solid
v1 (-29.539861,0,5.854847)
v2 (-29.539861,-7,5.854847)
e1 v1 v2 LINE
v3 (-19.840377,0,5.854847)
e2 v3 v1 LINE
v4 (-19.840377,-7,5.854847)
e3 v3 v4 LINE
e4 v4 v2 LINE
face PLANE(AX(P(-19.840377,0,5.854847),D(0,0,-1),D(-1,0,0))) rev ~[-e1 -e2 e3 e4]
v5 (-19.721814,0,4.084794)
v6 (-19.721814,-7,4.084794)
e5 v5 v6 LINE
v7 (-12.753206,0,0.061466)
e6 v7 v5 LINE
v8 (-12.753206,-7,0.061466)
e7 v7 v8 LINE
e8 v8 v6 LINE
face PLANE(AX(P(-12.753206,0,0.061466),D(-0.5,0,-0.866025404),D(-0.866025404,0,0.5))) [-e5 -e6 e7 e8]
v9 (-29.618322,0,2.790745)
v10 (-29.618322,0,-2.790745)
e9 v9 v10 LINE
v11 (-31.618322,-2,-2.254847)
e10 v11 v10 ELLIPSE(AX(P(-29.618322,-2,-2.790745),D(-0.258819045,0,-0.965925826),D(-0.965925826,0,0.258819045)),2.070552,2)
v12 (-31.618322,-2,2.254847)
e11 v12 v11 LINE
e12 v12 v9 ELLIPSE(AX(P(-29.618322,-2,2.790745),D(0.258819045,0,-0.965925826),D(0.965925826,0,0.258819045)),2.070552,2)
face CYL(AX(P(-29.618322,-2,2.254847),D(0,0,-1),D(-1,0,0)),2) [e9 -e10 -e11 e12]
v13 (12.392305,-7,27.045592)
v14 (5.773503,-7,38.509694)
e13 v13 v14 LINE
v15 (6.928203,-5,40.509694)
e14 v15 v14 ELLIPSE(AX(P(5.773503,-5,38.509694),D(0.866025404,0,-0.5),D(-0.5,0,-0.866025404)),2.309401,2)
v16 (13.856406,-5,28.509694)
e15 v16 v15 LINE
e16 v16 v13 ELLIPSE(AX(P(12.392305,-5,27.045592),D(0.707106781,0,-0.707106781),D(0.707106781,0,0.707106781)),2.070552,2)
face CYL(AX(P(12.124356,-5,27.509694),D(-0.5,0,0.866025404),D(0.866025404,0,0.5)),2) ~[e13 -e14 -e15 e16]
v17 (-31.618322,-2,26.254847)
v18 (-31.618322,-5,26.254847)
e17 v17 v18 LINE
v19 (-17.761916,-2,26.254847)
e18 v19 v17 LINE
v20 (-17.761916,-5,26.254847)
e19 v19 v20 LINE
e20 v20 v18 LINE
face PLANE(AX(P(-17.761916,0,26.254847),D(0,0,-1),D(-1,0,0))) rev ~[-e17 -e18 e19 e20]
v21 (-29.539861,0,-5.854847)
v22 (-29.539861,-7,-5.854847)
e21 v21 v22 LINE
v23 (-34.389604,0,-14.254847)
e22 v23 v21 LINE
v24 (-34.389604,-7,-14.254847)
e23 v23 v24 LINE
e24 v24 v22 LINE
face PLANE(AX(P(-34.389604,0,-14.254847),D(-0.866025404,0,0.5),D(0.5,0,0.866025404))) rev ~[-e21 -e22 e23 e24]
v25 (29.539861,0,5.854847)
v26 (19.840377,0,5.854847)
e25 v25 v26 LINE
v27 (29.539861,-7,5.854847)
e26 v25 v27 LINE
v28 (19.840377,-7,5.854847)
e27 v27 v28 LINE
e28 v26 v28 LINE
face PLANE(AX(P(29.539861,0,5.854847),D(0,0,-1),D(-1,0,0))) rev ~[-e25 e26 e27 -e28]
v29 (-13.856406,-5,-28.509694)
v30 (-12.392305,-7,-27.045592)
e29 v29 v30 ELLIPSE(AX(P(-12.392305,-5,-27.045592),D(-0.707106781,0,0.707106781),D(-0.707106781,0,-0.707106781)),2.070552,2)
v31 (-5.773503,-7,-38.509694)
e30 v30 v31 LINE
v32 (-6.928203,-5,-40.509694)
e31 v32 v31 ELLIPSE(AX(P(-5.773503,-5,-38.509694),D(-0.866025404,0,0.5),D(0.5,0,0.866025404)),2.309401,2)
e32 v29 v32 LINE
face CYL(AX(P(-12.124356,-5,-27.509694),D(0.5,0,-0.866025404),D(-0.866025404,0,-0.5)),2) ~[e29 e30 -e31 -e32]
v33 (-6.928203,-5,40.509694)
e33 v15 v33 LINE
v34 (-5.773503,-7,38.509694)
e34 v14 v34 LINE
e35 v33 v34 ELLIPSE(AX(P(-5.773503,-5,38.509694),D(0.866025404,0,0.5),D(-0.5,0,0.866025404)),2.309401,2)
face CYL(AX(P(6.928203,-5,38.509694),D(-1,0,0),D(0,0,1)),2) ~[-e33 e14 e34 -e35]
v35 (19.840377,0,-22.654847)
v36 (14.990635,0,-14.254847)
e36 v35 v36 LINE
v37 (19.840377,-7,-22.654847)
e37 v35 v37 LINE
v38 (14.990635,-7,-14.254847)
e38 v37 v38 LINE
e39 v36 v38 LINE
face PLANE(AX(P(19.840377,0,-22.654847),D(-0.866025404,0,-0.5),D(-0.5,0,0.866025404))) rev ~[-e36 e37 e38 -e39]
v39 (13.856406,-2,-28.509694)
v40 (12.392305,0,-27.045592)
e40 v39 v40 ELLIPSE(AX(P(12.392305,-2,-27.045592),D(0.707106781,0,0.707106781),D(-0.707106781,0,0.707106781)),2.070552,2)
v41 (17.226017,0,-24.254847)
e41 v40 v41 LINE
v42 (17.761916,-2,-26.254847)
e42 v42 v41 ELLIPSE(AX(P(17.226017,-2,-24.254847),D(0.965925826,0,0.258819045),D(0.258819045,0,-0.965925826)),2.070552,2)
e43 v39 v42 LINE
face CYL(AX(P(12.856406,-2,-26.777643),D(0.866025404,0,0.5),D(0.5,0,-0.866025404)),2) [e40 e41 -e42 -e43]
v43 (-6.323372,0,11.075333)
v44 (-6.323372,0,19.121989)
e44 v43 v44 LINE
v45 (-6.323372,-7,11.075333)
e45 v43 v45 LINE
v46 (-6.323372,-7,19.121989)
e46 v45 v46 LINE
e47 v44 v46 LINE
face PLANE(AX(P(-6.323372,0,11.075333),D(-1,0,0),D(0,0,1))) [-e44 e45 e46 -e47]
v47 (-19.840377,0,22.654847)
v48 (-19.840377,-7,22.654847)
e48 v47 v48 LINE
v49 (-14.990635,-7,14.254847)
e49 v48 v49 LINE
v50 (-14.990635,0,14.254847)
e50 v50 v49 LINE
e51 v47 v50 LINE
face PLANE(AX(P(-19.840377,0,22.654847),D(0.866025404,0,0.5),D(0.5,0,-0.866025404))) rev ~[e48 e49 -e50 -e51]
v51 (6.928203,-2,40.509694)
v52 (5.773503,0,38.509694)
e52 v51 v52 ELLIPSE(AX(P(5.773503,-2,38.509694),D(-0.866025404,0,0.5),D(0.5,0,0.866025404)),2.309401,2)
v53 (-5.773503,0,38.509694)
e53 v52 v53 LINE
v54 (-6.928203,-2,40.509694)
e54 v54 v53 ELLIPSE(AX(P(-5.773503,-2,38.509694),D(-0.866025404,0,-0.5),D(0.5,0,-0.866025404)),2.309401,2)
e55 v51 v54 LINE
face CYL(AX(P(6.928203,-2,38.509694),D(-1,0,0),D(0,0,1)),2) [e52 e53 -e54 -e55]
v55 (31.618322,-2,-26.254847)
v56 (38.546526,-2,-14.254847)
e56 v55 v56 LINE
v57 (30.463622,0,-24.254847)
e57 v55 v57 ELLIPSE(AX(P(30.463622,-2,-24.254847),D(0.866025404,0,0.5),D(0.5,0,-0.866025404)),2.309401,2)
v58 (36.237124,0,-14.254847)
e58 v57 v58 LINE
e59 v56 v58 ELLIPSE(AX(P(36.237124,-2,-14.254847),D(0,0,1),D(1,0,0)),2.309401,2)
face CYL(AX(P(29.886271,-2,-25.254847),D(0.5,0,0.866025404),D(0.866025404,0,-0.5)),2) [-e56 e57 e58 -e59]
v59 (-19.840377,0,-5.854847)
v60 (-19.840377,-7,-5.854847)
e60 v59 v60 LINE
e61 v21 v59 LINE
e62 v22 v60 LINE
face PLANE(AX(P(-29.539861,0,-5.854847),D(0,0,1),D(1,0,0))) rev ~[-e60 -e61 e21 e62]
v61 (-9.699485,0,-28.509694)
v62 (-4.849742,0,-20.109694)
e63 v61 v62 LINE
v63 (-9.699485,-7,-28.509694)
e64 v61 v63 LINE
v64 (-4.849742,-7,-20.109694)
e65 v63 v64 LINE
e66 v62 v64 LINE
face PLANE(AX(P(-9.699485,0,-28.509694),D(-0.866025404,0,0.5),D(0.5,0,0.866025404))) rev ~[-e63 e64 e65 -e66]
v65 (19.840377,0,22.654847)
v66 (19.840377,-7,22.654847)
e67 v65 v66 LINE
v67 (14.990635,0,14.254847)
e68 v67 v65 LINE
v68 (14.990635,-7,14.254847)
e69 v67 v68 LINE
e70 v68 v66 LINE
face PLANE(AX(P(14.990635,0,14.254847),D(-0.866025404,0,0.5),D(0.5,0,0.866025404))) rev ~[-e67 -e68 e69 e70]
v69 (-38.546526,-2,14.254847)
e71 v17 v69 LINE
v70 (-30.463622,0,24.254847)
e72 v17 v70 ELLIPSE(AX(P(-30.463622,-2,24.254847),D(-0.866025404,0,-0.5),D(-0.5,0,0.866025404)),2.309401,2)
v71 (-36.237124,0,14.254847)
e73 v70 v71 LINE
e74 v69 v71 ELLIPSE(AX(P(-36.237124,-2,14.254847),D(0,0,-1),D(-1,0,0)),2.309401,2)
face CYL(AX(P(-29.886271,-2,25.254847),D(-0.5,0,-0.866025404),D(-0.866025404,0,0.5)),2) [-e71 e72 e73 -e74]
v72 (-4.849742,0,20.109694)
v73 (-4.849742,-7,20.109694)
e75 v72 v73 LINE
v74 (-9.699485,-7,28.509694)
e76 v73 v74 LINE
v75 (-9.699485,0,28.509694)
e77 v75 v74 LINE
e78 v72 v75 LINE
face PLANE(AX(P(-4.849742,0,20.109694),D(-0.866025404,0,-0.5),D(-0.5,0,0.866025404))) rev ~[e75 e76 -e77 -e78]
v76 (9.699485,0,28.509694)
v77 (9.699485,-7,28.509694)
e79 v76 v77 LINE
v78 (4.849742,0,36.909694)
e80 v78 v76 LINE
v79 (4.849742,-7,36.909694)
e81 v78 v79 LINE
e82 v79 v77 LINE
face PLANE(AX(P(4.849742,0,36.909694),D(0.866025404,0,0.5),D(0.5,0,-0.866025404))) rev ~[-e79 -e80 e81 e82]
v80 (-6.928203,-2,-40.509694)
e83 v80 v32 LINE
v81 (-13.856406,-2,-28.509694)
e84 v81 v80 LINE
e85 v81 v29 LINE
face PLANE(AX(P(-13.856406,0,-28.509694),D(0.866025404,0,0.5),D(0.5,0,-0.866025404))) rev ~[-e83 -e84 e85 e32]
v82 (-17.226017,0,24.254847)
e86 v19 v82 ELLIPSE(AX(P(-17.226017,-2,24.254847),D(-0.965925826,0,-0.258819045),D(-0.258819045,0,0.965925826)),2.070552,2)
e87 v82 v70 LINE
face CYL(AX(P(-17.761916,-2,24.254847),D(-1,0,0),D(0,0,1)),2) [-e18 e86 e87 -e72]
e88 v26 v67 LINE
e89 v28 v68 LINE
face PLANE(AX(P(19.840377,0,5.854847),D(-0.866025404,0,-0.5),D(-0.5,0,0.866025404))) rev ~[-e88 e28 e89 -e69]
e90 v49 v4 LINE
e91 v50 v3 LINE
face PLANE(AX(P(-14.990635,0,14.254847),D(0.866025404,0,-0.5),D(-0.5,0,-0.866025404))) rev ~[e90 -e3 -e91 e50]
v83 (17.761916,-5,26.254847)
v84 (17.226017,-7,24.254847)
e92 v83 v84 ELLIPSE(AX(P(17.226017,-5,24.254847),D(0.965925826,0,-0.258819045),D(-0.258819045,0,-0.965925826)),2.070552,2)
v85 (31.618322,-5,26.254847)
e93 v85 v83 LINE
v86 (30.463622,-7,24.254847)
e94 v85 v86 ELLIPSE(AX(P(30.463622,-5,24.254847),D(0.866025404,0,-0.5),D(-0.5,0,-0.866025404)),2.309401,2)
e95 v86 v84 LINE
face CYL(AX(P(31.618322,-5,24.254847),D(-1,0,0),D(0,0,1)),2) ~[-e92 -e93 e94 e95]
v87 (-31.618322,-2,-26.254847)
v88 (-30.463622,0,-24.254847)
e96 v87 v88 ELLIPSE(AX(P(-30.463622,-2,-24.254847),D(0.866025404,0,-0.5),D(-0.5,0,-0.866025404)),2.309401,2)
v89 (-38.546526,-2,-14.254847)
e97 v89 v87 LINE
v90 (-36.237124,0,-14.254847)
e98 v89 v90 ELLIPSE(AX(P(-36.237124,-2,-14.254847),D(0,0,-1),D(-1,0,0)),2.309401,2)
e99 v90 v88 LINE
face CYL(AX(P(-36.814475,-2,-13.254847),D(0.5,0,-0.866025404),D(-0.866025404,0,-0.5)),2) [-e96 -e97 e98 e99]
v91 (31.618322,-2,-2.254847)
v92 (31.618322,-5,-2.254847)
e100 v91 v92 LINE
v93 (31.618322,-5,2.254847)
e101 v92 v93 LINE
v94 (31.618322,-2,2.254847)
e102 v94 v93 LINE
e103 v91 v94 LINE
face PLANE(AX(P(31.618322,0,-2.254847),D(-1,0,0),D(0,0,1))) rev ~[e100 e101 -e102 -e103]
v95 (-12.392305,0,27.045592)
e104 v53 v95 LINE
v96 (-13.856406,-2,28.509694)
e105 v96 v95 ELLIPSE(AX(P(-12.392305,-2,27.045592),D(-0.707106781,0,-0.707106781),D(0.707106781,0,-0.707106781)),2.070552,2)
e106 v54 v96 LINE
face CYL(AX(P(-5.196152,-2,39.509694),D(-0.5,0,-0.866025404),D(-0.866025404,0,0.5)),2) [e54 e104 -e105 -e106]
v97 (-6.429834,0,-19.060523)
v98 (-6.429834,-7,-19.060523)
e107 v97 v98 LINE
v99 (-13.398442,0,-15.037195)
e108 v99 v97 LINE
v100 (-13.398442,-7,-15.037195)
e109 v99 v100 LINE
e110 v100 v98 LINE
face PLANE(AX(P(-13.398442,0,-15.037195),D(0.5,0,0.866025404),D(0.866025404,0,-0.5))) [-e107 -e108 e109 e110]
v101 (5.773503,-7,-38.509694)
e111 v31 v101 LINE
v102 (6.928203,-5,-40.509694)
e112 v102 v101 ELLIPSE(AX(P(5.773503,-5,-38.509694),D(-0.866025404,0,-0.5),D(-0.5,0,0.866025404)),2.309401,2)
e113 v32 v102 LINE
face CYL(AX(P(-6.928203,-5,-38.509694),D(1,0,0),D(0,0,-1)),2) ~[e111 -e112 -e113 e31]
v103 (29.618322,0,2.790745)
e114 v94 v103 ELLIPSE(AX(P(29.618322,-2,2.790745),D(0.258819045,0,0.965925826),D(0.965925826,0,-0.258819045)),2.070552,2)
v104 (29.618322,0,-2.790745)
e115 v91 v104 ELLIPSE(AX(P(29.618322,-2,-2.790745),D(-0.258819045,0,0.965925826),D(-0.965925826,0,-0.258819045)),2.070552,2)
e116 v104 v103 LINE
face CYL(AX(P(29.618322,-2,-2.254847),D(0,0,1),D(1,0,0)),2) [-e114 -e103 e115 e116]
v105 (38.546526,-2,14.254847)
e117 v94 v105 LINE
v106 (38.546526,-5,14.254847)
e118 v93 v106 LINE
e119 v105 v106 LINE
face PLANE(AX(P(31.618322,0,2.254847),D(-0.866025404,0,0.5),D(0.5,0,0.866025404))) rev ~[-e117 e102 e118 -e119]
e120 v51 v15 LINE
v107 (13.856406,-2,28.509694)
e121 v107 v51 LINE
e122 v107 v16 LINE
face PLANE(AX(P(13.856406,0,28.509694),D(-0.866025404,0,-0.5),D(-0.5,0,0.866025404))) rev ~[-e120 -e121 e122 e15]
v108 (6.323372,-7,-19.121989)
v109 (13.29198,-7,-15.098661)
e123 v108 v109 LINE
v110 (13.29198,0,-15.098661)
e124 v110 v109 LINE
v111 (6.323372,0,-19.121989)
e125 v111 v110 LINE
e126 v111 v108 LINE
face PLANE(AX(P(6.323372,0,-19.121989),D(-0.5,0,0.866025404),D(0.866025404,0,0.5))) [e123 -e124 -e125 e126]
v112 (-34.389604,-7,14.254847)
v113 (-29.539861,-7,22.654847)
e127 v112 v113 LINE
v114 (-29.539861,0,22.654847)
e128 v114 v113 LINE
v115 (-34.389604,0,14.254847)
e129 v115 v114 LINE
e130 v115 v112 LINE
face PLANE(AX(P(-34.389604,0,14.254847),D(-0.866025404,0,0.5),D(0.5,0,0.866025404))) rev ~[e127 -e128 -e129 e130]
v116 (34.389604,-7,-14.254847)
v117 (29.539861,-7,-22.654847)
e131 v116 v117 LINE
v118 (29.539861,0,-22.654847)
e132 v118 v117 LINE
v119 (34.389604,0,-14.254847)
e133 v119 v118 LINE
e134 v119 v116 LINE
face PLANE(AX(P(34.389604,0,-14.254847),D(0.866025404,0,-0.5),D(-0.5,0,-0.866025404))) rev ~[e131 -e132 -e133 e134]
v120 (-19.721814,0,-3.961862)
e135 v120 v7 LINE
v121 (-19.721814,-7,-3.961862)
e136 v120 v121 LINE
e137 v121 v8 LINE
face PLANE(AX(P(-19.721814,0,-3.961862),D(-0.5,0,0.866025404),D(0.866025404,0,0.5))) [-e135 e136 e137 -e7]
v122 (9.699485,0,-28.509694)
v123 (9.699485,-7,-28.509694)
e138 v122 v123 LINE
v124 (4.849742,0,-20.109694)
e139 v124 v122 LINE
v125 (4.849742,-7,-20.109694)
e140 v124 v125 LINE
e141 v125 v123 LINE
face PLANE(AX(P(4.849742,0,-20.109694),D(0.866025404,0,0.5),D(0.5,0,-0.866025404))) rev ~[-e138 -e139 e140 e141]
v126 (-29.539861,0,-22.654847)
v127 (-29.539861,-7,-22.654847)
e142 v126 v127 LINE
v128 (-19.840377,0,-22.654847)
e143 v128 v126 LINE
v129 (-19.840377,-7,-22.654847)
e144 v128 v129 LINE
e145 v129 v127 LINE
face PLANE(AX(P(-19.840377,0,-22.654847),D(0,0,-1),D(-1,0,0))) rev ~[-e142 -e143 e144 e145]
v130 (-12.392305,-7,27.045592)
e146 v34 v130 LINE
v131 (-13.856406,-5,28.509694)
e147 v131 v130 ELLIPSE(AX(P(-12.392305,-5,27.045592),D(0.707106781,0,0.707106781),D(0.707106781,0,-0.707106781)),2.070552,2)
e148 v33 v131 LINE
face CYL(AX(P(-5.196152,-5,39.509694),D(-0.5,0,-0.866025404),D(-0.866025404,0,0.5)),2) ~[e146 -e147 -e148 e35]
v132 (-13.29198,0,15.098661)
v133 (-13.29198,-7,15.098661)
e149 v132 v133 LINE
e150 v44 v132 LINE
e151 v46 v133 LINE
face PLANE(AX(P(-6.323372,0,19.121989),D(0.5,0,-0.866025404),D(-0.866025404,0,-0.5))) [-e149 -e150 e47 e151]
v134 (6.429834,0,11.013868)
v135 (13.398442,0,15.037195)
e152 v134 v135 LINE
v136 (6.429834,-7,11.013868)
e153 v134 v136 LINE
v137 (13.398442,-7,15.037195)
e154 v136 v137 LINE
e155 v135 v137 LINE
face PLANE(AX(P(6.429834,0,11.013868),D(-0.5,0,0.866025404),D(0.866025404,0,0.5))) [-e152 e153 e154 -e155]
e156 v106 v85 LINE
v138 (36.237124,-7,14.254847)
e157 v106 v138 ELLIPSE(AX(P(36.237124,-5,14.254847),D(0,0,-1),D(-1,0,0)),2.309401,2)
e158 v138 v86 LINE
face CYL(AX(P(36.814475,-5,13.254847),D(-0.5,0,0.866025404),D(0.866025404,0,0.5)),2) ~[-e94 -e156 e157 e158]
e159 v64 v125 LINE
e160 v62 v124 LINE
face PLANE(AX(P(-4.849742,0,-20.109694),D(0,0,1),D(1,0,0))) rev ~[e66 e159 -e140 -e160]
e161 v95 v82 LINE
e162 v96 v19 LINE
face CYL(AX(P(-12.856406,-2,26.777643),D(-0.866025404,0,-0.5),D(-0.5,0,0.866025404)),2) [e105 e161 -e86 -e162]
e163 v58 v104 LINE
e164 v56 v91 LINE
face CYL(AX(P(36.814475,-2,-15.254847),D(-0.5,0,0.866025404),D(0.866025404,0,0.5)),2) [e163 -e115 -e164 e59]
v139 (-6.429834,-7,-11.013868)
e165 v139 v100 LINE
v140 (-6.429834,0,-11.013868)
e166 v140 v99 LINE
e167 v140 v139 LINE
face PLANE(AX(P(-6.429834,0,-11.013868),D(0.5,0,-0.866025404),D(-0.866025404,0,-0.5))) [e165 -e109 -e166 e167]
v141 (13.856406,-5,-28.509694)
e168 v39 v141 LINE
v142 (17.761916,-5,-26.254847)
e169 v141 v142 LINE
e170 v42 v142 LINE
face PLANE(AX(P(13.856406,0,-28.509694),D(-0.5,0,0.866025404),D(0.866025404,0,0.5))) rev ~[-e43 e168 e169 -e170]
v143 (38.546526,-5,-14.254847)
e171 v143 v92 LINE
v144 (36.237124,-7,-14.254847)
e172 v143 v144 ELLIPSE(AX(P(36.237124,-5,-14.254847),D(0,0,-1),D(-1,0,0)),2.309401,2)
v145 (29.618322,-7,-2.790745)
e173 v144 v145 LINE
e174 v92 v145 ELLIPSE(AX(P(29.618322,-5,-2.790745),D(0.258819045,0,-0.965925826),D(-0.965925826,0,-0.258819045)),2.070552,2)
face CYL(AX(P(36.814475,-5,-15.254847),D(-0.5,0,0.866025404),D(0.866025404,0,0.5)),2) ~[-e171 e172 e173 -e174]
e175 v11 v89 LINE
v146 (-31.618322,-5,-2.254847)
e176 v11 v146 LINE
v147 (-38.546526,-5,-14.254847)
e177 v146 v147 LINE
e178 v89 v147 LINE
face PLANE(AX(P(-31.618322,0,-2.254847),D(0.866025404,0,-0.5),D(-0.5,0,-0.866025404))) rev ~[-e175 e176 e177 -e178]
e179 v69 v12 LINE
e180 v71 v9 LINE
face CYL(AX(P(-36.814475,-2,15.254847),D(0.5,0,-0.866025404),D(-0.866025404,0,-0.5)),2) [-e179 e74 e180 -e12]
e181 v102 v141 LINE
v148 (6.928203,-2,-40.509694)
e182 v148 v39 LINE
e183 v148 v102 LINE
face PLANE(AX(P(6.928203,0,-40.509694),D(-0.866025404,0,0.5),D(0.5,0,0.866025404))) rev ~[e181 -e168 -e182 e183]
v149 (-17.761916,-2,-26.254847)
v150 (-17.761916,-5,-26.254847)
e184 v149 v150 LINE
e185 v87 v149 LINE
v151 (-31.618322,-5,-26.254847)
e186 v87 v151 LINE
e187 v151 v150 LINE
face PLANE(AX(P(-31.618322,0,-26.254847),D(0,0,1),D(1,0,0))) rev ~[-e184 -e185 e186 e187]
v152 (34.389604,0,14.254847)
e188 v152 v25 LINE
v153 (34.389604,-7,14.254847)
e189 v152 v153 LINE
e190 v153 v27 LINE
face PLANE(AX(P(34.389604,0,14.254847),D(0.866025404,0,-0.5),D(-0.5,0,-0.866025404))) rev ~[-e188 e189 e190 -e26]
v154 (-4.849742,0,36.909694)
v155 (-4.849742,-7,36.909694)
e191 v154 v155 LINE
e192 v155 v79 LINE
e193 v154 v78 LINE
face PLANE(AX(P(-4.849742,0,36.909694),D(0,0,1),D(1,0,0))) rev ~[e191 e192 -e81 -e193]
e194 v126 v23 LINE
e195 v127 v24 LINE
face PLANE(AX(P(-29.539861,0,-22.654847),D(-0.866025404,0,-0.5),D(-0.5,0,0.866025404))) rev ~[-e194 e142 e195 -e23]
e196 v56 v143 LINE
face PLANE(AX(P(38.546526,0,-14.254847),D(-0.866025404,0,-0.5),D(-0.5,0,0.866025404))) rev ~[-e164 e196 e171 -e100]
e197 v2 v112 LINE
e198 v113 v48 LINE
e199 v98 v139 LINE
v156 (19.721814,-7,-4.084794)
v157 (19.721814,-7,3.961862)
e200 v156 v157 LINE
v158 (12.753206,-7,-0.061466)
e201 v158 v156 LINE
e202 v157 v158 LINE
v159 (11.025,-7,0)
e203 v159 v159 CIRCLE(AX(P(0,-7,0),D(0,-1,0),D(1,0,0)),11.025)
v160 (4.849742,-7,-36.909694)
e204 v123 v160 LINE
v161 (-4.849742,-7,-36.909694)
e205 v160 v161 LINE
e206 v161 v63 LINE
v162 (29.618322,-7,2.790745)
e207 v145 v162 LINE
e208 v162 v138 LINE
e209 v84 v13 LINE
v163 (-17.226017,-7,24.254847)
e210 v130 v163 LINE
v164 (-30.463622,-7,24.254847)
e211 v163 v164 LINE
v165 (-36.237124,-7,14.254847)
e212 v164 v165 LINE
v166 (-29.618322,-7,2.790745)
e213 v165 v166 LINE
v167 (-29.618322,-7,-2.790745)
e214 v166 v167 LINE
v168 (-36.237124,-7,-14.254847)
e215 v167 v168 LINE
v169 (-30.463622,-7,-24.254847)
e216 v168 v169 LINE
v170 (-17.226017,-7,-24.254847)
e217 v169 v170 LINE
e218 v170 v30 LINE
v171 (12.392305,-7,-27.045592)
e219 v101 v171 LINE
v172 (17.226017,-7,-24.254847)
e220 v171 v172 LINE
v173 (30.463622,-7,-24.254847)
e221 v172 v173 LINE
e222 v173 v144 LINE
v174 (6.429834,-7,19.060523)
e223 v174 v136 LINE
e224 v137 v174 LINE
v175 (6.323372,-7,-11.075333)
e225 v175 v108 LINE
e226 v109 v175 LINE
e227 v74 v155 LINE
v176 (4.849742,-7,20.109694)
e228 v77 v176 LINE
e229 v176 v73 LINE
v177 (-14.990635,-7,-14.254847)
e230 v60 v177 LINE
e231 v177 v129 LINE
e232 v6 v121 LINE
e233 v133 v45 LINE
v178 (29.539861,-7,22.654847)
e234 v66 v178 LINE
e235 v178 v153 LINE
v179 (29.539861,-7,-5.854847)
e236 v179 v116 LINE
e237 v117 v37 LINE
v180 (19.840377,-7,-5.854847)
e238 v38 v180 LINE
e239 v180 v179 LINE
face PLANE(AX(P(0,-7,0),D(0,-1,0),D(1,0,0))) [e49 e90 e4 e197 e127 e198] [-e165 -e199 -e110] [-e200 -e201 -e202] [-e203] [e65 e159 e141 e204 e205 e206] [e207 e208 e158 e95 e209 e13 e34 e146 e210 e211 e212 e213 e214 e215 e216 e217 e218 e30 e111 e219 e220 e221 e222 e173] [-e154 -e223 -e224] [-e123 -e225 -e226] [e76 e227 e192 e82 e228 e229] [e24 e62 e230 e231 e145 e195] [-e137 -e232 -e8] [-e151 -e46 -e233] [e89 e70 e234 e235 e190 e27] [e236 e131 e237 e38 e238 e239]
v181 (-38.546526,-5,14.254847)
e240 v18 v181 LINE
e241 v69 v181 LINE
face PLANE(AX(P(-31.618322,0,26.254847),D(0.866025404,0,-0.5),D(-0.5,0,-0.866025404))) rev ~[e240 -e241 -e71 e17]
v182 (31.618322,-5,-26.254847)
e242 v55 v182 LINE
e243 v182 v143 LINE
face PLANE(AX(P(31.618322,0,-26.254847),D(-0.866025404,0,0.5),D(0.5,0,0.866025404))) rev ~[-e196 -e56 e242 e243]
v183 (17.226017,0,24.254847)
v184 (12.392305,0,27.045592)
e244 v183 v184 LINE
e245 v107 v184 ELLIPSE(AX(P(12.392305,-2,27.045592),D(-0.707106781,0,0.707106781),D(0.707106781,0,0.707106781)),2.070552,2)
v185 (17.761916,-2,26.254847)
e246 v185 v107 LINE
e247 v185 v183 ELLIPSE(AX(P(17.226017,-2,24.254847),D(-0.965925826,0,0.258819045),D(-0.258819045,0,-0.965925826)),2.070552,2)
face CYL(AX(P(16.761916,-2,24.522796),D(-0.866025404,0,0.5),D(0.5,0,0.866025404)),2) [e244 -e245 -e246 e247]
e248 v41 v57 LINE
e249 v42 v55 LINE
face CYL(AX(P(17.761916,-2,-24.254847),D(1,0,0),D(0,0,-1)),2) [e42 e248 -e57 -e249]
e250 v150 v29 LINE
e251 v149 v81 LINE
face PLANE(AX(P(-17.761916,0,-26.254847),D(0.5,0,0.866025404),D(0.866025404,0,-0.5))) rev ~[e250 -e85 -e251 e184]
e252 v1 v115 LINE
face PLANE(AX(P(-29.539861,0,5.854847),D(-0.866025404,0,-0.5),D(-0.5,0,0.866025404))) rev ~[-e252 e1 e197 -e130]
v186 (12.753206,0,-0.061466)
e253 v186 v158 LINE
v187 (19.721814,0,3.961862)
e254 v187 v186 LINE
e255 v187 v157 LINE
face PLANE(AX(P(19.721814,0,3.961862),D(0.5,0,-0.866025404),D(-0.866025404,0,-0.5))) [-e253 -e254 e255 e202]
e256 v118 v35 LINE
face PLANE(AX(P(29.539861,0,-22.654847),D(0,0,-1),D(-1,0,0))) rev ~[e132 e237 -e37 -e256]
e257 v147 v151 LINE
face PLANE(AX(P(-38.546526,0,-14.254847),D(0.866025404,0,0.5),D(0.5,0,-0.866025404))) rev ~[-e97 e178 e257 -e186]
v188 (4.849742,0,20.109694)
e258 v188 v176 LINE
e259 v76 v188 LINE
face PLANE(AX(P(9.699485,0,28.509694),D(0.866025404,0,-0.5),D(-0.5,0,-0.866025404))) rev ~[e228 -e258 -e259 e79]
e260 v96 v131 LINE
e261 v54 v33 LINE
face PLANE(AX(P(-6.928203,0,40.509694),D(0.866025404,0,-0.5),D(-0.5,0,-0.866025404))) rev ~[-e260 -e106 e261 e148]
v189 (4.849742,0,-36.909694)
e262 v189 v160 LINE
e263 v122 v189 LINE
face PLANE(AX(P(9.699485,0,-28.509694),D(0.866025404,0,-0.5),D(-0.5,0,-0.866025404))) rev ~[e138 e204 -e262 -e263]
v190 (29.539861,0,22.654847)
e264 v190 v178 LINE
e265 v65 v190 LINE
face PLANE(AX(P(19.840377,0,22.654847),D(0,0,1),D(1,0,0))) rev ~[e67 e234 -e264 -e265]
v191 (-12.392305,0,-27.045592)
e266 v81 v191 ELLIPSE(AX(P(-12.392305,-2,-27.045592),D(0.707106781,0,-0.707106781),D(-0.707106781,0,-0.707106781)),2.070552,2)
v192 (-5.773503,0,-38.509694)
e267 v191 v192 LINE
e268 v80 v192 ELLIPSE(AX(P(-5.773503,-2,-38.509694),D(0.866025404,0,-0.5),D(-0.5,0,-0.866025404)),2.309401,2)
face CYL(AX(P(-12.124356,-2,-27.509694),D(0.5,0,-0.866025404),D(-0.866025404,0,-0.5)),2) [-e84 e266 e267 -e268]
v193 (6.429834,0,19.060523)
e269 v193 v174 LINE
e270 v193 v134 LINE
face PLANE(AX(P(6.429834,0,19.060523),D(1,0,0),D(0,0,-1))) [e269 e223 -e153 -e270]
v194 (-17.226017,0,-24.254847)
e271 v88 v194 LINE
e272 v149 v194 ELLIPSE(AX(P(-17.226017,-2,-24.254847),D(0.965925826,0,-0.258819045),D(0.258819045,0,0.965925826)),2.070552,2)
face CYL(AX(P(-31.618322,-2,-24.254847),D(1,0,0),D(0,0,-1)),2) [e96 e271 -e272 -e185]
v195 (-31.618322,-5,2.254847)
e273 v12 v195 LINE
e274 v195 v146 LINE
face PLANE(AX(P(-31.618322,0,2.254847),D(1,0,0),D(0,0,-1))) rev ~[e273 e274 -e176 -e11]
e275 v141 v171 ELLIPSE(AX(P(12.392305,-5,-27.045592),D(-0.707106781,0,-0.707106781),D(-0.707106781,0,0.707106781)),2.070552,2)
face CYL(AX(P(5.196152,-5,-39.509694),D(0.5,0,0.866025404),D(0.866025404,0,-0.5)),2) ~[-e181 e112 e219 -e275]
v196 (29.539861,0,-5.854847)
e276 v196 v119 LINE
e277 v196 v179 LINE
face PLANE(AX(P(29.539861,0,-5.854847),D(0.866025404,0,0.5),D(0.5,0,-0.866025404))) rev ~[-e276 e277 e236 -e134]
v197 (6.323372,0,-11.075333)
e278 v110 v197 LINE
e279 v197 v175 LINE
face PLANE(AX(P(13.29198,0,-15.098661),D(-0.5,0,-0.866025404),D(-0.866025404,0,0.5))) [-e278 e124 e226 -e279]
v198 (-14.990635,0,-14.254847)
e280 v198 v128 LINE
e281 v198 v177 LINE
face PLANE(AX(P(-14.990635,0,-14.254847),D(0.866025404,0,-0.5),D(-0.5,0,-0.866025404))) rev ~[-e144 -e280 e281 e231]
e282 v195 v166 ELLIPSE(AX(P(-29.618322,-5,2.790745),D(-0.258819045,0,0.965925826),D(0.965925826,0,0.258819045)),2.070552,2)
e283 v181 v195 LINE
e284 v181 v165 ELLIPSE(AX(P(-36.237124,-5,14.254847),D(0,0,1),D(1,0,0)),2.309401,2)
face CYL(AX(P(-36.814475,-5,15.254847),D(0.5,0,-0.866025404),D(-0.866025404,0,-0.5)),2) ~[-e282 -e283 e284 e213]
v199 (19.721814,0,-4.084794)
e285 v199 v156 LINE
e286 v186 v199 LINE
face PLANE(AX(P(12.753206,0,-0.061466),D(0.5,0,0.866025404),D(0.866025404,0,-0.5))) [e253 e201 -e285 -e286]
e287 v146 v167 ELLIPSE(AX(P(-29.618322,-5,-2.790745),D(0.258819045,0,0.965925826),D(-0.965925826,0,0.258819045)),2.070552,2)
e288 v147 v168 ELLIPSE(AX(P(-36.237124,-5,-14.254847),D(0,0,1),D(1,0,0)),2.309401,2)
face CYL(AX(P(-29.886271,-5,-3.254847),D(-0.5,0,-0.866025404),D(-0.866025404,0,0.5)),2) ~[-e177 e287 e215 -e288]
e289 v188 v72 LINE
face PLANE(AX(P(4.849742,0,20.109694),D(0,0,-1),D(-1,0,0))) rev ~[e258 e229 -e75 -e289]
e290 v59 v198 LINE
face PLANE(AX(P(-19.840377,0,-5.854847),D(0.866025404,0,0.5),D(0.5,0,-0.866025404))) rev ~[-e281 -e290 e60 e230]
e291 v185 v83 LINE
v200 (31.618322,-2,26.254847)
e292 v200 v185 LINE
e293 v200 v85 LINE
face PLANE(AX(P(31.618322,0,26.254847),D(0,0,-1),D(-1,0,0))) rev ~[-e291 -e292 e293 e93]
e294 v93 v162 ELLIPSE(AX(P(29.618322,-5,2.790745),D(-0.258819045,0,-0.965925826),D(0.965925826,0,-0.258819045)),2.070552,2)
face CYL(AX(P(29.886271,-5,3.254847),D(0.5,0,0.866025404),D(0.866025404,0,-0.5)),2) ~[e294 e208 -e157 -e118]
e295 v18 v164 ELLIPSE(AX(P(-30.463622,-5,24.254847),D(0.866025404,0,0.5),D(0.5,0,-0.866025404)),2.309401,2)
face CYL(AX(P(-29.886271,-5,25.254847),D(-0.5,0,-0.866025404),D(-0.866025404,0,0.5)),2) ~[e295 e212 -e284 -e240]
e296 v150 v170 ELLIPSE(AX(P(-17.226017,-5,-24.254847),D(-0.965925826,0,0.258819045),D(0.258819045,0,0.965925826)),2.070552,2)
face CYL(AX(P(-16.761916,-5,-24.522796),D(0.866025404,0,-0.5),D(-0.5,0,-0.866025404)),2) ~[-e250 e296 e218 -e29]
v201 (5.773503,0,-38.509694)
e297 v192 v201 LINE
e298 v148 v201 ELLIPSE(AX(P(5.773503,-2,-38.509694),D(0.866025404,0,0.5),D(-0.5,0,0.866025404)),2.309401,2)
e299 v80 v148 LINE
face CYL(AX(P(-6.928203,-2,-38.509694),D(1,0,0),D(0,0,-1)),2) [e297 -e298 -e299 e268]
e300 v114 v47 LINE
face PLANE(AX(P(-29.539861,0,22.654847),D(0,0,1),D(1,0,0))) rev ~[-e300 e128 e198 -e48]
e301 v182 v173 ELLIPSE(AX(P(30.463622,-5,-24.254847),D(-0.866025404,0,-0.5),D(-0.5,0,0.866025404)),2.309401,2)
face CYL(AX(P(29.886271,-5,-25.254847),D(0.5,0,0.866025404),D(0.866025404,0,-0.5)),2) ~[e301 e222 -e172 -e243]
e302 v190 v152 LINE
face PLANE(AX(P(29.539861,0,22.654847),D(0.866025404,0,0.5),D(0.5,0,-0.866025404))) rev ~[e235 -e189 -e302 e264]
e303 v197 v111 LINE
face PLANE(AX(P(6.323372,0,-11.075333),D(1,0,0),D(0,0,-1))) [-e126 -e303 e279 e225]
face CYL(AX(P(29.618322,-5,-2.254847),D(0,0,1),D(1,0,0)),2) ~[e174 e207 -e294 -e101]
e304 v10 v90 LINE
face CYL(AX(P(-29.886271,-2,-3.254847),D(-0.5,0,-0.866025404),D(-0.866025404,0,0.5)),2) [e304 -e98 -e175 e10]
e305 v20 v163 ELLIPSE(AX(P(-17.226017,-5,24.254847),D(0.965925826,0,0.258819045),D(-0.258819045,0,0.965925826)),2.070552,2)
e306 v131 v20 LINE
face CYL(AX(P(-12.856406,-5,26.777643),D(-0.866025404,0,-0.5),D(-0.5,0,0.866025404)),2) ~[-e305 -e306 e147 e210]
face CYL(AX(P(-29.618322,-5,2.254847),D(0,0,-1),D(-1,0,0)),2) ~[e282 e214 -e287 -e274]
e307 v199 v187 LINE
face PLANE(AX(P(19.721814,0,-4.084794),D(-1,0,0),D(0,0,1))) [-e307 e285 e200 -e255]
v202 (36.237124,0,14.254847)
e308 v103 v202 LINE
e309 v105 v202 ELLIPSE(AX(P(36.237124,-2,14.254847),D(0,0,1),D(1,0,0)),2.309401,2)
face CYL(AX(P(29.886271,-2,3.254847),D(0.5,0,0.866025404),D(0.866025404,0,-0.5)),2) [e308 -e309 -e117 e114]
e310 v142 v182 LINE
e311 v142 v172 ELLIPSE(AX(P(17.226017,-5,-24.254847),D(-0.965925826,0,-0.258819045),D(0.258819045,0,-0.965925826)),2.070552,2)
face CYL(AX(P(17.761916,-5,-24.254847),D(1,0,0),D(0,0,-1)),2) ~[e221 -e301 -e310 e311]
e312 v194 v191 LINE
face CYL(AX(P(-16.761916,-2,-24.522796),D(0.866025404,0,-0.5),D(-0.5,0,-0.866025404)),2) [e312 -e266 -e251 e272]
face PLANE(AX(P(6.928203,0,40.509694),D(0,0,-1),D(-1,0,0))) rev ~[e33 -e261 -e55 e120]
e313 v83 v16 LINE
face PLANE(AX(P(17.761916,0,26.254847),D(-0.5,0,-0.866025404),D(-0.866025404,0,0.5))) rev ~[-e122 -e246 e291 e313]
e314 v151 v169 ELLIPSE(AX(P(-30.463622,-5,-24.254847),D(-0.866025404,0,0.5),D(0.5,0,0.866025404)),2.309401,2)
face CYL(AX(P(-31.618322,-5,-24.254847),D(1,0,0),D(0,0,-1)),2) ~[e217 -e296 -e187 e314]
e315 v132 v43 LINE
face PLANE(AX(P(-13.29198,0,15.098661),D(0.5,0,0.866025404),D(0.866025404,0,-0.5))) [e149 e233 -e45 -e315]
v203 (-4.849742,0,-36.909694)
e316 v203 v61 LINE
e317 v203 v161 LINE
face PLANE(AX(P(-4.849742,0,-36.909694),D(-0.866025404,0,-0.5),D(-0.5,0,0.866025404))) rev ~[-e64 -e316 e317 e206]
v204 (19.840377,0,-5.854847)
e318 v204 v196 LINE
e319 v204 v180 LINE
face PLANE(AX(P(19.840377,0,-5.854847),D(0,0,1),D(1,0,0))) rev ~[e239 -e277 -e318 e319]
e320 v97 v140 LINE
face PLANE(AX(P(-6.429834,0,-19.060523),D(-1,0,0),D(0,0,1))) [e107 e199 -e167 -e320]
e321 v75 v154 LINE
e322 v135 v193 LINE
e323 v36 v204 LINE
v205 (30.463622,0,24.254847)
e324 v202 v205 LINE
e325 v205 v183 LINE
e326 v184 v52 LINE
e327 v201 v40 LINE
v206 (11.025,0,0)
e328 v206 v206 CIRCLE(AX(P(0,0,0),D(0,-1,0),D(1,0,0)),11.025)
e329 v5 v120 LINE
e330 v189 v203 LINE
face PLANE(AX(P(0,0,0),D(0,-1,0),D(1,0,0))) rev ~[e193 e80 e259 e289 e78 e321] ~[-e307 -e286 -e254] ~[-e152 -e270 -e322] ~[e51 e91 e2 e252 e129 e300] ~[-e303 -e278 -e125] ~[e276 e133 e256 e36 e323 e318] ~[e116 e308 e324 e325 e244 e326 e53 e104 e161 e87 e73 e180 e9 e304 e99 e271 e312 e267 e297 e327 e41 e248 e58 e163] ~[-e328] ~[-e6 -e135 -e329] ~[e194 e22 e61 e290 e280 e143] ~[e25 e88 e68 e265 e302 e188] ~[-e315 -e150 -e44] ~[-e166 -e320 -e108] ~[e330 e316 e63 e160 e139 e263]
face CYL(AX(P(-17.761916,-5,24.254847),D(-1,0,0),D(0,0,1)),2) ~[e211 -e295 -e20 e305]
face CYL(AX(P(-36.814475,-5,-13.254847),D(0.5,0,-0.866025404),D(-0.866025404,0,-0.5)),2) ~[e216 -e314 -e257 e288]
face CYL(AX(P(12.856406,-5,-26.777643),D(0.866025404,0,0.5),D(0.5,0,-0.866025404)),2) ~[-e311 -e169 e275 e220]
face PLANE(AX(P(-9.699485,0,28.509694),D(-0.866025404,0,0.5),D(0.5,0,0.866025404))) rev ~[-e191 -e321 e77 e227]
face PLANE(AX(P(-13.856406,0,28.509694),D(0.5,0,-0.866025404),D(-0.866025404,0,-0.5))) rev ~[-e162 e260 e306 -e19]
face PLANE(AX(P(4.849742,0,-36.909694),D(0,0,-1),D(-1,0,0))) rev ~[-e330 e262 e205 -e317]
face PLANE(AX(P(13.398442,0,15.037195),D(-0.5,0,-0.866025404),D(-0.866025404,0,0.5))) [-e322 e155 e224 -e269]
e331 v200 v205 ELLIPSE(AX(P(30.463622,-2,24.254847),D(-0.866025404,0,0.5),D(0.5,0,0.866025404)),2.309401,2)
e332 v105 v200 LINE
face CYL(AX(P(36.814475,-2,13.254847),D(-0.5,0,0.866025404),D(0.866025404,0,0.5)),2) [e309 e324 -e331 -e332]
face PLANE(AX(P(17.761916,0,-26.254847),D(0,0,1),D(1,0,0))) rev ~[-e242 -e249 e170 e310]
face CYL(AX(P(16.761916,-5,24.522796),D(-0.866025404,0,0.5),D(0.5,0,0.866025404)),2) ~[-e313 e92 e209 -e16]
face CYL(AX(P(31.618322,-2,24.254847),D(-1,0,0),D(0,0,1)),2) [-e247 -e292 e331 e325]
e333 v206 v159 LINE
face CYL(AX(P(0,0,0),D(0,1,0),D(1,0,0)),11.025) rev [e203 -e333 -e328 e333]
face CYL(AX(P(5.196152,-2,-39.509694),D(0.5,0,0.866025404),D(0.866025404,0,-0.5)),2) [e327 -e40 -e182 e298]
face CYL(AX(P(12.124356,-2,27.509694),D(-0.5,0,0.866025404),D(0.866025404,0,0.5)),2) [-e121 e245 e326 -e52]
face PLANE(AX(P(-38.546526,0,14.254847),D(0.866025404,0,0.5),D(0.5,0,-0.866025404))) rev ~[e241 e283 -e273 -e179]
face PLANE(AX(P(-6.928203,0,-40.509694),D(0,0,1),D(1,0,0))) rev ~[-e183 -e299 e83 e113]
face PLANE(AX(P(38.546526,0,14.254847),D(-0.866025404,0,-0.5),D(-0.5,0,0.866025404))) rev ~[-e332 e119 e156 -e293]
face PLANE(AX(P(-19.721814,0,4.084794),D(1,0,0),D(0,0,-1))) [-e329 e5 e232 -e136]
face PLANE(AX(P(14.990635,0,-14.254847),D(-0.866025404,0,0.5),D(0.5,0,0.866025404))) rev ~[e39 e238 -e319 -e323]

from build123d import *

# Parameters (mm, degrees)
F0_R     = 14.5
F0_R_2   = 11.025
F1_DEPTH = 7
F2_R     = 2
F4_DEPTH = 7


# Not quite as in the source:
# - a feature names something its author has since deleted; it is built from what else it names


with BuildPart() as f1:
    # F0 (on Front) → F1 (new body)
    with BuildSketch(Plane.XZ):
        Polygon((13.8564064606, 28.5096937621), (6.9282032303, 16.5096937621), (-6.9282032303, 16.5096937621), (-13.8564064606, 28.5096937621), (-17.7619158218, 26.254846881), (-10.8337125915, 14.254846881), (-17.7619158218, 2.254846881), (-31.6183222823, 2.254846881), (-31.6183222823, -2.254846881), (-17.7619158218, -2.254846881), (-10.8337125915, -14.254846881), (-17.7619158218, -26.254846881), (-13.8564064606, -28.5096937621), (-6.9282032303, -16.5096937621), (6.9282032303, -16.5096937621), (13.8564064606, -28.5096937621), (17.7619158218, -26.254846881), (10.8337125915, -14.254846881), (17.7619158218, -2.254846881), (31.6183222823, -2.254846881), (31.6183222823, 2.254846881), (17.7619158218, 2.254846881), (10.8337125915, 14.254846881), (17.7619158218, 26.254846881), align=None)
        Circle(F0_R, mode=Mode.SUBTRACT)
        Polygon((-6.9282032303, 16.5096937621), (6.9282032303, 16.5096937621), (13.8564064606, 28.5096937621), (6.9282032303, 40.5096937621), (-6.9282032303, 40.5096937621), (-13.8564064606, 28.5096937621), align=None)
        Polygon((9.6994845224, 28.5096937621), (4.8497422612, 20.1096937621), (-4.8497422612, 20.1096937621), (-9.6994845224, 28.5096937621), (-4.8497422612, 36.9096937621), (4.8497422612, 36.9096937621), align=None, mode=Mode.SUBTRACT)
        Polygon((31.6183222823, 26.254846881), (17.7619158218, 26.254846881), (10.8337125915, 14.254846881), (17.7619158218, 2.254846881), (31.6183222823, 2.254846881), (38.5465255126, 14.254846881), align=None)
        Polygon((29.5398613133, 22.654846881), (34.3896035744, 14.254846881), (29.5398613133, 5.854846881), (19.8403767909, 5.854846881), (14.9906345297, 14.254846881), (19.8403767909, 22.654846881), align=None, mode=Mode.SUBTRACT)
        Polygon((-10.8337125915, 14.254846881), (-17.7619158218, 26.254846881), (-31.6183222823, 26.254846881), (-38.5465255126, 14.254846881), (-31.6183222823, 2.254846881), (-17.7619158218, 2.254846881), align=None)
        Polygon((-34.3896035744, 14.254846881), (-29.5398613133, 22.654846881), (-19.8403767909, 22.654846881), (-14.9906345297, 14.254846881), (-19.8403767909, 5.854846881), (-29.5398613133, 5.854846881), align=None, mode=Mode.SUBTRACT)
        Polygon((38.5465255126, -14.254846881), (31.6183222823, -2.254846881), (17.7619158218, -2.254846881), (10.8337125915, -14.254846881), (17.7619158218, -26.254846881), (31.6183222823, -26.254846881), align=None)
        Polygon((34.3896035744, -14.254846881), (29.5398613133, -22.654846881), (19.8403767909, -22.654846881), (14.9906345297, -14.254846881), (19.8403767909, -5.854846881), (29.5398613133, -5.854846881), align=None, mode=Mode.SUBTRACT)
        Polygon((-17.7619158218, -2.254846881), (-31.6183222823, -2.254846881), (-38.5465255126, -14.254846881), (-31.6183222823, -26.254846881), (-17.7619158218, -26.254846881), (-10.8337125915, -14.254846881), align=None)
        Polygon((-29.5398613133, -22.654846881), (-34.3896035744, -14.254846881), (-29.5398613133, -5.854846881), (-19.8403767909, -5.854846881), (-14.9906345297, -14.254846881), (-19.8403767909, -22.654846881), align=None, mode=Mode.SUBTRACT)
        Polygon((6.9282032303, -40.5096937621), (13.8564064606, -28.5096937621), (6.9282032303, -16.5096937621), (-6.9282032303, -16.5096937621), (-13.8564064606, -28.5096937621), (-6.9282032303, -40.5096937621), align=None)
        Polygon((4.8497422612, -36.9096937621), (-4.8497422612, -36.9096937621), (-9.6994845224, -28.5096937621), (-4.8497422612, -20.1096937621), (4.8497422612, -20.1096937621), (9.6994845224, -28.5096937621), align=None, mode=Mode.SUBTRACT)
        Circle(F0_R)
        Circle(F0_R_2, mode=Mode.SUBTRACT)
    extrude(amount=F1_DEPTH)

    # F2
    f2_edges = [f1.edges().sort_by_distance(p)[0] for p in [
        (0, -7, 40.509694),
        (10.392305, -7, 34.509694),
        (24.690119, -7, 26.254847),
        (35.082424, -7, 20.254847),
        (35.082424, -7, 8.254847),
        (35.082424, -7, -8.254847),
        (35.082424, -7, -20.254847),
        (24.690119, -7, -26.254847),
        (10.392305, -7, -34.509694),
        (0, -7, -40.509694),
        (-10.392305, -7, -34.509694),
        (-24.690119, -7, -26.254847),
        (-35.082424, -7, -20.254847),
        (-35.082424, -7, -8.254847),
        (-35.082424, -7, 8.254847),
        (-35.082424, -7, 20.254847),
        (-24.690119, -7, 26.254847),
        (-10.392305, -7, 34.509694),
        (-10.392305, 0, -34.509694),
        (10.392305, 0, -34.509694),
        (24.690119, 0, -26.254847),
        (35.082424, 0, -20.254847),
        (35.082424, 0, -8.254847),
        (35.082424, 0, 8.254847),
        (35.082424, 0, 20.254847),
        (24.690119, 0, 26.254847),
        (10.392305, 0, 34.509694),
        (-24.690119, 0, 26.254847),
        (-35.082424, 0, 20.254847),
        (-35.082424, 0, 8.254847),
        (-35.082424, 0, -8.254847),
        (-35.082424, 0, -20.254847),
        (-24.690119, 0, -26.254847),
        (0, 0, -40.509694),
        (-10.392305, 0, 34.509694),
        (0, 0, 40.509694),
        (-15.809161, -7, 27.38227),
        (15.809161, -7, 27.38227),
        (31.618322, -7, 0),
        (15.809161, -7, -27.38227),
        (-15.809161, -7, -27.38227),
        (-31.618322, -7, 0),
        (-15.809161, 0, 27.38227),
        (15.809161, 0, 27.38227),
        (31.618322, 0, 0),
        (15.809161, 0, -27.38227),
        (-15.809161, 0, -27.38227),
        (-31.618322, 0, 0),
    ]]
    fillet(f2_edges, radius=F2_R)

    # F3 (on Front) → F4 (cut)
    with BuildSketch(Plane.XZ):
        Polygon((-6.3233720139, 11.0753334069), (-6.3233720139, 19.1219889618), (-13.2919801399, 15.0986611843), align=None)
        Polygon((-19.7218142187, 4.0847936793), (-19.7218142187, -3.9618618756), (-12.7532060927, 0.0614659018), align=None)
        Polygon((-13.3984422048, -15.0371952825), (-6.4298340788, -19.0605230599), (-6.4298340788, -11.013867505), align=None)
        Polygon((6.3233720139, -19.1219889618), (13.2919801399, -15.0986611843), (6.3233720139, -11.0753334069), align=None)
        Polygon((19.7218142187, -4.0847936793), (19.7218142187, 3.9618618756), (12.7532060927, -0.0614659018), align=None)
        Polygon((13.3984422048, 15.0371952825), (6.4298340788, 19.0605230599), (6.4298340788, 11.013867505), align=None)
    extrude(amount=F4_DEPTH, mode=Mode.SUBTRACT)


solid = f1.part
